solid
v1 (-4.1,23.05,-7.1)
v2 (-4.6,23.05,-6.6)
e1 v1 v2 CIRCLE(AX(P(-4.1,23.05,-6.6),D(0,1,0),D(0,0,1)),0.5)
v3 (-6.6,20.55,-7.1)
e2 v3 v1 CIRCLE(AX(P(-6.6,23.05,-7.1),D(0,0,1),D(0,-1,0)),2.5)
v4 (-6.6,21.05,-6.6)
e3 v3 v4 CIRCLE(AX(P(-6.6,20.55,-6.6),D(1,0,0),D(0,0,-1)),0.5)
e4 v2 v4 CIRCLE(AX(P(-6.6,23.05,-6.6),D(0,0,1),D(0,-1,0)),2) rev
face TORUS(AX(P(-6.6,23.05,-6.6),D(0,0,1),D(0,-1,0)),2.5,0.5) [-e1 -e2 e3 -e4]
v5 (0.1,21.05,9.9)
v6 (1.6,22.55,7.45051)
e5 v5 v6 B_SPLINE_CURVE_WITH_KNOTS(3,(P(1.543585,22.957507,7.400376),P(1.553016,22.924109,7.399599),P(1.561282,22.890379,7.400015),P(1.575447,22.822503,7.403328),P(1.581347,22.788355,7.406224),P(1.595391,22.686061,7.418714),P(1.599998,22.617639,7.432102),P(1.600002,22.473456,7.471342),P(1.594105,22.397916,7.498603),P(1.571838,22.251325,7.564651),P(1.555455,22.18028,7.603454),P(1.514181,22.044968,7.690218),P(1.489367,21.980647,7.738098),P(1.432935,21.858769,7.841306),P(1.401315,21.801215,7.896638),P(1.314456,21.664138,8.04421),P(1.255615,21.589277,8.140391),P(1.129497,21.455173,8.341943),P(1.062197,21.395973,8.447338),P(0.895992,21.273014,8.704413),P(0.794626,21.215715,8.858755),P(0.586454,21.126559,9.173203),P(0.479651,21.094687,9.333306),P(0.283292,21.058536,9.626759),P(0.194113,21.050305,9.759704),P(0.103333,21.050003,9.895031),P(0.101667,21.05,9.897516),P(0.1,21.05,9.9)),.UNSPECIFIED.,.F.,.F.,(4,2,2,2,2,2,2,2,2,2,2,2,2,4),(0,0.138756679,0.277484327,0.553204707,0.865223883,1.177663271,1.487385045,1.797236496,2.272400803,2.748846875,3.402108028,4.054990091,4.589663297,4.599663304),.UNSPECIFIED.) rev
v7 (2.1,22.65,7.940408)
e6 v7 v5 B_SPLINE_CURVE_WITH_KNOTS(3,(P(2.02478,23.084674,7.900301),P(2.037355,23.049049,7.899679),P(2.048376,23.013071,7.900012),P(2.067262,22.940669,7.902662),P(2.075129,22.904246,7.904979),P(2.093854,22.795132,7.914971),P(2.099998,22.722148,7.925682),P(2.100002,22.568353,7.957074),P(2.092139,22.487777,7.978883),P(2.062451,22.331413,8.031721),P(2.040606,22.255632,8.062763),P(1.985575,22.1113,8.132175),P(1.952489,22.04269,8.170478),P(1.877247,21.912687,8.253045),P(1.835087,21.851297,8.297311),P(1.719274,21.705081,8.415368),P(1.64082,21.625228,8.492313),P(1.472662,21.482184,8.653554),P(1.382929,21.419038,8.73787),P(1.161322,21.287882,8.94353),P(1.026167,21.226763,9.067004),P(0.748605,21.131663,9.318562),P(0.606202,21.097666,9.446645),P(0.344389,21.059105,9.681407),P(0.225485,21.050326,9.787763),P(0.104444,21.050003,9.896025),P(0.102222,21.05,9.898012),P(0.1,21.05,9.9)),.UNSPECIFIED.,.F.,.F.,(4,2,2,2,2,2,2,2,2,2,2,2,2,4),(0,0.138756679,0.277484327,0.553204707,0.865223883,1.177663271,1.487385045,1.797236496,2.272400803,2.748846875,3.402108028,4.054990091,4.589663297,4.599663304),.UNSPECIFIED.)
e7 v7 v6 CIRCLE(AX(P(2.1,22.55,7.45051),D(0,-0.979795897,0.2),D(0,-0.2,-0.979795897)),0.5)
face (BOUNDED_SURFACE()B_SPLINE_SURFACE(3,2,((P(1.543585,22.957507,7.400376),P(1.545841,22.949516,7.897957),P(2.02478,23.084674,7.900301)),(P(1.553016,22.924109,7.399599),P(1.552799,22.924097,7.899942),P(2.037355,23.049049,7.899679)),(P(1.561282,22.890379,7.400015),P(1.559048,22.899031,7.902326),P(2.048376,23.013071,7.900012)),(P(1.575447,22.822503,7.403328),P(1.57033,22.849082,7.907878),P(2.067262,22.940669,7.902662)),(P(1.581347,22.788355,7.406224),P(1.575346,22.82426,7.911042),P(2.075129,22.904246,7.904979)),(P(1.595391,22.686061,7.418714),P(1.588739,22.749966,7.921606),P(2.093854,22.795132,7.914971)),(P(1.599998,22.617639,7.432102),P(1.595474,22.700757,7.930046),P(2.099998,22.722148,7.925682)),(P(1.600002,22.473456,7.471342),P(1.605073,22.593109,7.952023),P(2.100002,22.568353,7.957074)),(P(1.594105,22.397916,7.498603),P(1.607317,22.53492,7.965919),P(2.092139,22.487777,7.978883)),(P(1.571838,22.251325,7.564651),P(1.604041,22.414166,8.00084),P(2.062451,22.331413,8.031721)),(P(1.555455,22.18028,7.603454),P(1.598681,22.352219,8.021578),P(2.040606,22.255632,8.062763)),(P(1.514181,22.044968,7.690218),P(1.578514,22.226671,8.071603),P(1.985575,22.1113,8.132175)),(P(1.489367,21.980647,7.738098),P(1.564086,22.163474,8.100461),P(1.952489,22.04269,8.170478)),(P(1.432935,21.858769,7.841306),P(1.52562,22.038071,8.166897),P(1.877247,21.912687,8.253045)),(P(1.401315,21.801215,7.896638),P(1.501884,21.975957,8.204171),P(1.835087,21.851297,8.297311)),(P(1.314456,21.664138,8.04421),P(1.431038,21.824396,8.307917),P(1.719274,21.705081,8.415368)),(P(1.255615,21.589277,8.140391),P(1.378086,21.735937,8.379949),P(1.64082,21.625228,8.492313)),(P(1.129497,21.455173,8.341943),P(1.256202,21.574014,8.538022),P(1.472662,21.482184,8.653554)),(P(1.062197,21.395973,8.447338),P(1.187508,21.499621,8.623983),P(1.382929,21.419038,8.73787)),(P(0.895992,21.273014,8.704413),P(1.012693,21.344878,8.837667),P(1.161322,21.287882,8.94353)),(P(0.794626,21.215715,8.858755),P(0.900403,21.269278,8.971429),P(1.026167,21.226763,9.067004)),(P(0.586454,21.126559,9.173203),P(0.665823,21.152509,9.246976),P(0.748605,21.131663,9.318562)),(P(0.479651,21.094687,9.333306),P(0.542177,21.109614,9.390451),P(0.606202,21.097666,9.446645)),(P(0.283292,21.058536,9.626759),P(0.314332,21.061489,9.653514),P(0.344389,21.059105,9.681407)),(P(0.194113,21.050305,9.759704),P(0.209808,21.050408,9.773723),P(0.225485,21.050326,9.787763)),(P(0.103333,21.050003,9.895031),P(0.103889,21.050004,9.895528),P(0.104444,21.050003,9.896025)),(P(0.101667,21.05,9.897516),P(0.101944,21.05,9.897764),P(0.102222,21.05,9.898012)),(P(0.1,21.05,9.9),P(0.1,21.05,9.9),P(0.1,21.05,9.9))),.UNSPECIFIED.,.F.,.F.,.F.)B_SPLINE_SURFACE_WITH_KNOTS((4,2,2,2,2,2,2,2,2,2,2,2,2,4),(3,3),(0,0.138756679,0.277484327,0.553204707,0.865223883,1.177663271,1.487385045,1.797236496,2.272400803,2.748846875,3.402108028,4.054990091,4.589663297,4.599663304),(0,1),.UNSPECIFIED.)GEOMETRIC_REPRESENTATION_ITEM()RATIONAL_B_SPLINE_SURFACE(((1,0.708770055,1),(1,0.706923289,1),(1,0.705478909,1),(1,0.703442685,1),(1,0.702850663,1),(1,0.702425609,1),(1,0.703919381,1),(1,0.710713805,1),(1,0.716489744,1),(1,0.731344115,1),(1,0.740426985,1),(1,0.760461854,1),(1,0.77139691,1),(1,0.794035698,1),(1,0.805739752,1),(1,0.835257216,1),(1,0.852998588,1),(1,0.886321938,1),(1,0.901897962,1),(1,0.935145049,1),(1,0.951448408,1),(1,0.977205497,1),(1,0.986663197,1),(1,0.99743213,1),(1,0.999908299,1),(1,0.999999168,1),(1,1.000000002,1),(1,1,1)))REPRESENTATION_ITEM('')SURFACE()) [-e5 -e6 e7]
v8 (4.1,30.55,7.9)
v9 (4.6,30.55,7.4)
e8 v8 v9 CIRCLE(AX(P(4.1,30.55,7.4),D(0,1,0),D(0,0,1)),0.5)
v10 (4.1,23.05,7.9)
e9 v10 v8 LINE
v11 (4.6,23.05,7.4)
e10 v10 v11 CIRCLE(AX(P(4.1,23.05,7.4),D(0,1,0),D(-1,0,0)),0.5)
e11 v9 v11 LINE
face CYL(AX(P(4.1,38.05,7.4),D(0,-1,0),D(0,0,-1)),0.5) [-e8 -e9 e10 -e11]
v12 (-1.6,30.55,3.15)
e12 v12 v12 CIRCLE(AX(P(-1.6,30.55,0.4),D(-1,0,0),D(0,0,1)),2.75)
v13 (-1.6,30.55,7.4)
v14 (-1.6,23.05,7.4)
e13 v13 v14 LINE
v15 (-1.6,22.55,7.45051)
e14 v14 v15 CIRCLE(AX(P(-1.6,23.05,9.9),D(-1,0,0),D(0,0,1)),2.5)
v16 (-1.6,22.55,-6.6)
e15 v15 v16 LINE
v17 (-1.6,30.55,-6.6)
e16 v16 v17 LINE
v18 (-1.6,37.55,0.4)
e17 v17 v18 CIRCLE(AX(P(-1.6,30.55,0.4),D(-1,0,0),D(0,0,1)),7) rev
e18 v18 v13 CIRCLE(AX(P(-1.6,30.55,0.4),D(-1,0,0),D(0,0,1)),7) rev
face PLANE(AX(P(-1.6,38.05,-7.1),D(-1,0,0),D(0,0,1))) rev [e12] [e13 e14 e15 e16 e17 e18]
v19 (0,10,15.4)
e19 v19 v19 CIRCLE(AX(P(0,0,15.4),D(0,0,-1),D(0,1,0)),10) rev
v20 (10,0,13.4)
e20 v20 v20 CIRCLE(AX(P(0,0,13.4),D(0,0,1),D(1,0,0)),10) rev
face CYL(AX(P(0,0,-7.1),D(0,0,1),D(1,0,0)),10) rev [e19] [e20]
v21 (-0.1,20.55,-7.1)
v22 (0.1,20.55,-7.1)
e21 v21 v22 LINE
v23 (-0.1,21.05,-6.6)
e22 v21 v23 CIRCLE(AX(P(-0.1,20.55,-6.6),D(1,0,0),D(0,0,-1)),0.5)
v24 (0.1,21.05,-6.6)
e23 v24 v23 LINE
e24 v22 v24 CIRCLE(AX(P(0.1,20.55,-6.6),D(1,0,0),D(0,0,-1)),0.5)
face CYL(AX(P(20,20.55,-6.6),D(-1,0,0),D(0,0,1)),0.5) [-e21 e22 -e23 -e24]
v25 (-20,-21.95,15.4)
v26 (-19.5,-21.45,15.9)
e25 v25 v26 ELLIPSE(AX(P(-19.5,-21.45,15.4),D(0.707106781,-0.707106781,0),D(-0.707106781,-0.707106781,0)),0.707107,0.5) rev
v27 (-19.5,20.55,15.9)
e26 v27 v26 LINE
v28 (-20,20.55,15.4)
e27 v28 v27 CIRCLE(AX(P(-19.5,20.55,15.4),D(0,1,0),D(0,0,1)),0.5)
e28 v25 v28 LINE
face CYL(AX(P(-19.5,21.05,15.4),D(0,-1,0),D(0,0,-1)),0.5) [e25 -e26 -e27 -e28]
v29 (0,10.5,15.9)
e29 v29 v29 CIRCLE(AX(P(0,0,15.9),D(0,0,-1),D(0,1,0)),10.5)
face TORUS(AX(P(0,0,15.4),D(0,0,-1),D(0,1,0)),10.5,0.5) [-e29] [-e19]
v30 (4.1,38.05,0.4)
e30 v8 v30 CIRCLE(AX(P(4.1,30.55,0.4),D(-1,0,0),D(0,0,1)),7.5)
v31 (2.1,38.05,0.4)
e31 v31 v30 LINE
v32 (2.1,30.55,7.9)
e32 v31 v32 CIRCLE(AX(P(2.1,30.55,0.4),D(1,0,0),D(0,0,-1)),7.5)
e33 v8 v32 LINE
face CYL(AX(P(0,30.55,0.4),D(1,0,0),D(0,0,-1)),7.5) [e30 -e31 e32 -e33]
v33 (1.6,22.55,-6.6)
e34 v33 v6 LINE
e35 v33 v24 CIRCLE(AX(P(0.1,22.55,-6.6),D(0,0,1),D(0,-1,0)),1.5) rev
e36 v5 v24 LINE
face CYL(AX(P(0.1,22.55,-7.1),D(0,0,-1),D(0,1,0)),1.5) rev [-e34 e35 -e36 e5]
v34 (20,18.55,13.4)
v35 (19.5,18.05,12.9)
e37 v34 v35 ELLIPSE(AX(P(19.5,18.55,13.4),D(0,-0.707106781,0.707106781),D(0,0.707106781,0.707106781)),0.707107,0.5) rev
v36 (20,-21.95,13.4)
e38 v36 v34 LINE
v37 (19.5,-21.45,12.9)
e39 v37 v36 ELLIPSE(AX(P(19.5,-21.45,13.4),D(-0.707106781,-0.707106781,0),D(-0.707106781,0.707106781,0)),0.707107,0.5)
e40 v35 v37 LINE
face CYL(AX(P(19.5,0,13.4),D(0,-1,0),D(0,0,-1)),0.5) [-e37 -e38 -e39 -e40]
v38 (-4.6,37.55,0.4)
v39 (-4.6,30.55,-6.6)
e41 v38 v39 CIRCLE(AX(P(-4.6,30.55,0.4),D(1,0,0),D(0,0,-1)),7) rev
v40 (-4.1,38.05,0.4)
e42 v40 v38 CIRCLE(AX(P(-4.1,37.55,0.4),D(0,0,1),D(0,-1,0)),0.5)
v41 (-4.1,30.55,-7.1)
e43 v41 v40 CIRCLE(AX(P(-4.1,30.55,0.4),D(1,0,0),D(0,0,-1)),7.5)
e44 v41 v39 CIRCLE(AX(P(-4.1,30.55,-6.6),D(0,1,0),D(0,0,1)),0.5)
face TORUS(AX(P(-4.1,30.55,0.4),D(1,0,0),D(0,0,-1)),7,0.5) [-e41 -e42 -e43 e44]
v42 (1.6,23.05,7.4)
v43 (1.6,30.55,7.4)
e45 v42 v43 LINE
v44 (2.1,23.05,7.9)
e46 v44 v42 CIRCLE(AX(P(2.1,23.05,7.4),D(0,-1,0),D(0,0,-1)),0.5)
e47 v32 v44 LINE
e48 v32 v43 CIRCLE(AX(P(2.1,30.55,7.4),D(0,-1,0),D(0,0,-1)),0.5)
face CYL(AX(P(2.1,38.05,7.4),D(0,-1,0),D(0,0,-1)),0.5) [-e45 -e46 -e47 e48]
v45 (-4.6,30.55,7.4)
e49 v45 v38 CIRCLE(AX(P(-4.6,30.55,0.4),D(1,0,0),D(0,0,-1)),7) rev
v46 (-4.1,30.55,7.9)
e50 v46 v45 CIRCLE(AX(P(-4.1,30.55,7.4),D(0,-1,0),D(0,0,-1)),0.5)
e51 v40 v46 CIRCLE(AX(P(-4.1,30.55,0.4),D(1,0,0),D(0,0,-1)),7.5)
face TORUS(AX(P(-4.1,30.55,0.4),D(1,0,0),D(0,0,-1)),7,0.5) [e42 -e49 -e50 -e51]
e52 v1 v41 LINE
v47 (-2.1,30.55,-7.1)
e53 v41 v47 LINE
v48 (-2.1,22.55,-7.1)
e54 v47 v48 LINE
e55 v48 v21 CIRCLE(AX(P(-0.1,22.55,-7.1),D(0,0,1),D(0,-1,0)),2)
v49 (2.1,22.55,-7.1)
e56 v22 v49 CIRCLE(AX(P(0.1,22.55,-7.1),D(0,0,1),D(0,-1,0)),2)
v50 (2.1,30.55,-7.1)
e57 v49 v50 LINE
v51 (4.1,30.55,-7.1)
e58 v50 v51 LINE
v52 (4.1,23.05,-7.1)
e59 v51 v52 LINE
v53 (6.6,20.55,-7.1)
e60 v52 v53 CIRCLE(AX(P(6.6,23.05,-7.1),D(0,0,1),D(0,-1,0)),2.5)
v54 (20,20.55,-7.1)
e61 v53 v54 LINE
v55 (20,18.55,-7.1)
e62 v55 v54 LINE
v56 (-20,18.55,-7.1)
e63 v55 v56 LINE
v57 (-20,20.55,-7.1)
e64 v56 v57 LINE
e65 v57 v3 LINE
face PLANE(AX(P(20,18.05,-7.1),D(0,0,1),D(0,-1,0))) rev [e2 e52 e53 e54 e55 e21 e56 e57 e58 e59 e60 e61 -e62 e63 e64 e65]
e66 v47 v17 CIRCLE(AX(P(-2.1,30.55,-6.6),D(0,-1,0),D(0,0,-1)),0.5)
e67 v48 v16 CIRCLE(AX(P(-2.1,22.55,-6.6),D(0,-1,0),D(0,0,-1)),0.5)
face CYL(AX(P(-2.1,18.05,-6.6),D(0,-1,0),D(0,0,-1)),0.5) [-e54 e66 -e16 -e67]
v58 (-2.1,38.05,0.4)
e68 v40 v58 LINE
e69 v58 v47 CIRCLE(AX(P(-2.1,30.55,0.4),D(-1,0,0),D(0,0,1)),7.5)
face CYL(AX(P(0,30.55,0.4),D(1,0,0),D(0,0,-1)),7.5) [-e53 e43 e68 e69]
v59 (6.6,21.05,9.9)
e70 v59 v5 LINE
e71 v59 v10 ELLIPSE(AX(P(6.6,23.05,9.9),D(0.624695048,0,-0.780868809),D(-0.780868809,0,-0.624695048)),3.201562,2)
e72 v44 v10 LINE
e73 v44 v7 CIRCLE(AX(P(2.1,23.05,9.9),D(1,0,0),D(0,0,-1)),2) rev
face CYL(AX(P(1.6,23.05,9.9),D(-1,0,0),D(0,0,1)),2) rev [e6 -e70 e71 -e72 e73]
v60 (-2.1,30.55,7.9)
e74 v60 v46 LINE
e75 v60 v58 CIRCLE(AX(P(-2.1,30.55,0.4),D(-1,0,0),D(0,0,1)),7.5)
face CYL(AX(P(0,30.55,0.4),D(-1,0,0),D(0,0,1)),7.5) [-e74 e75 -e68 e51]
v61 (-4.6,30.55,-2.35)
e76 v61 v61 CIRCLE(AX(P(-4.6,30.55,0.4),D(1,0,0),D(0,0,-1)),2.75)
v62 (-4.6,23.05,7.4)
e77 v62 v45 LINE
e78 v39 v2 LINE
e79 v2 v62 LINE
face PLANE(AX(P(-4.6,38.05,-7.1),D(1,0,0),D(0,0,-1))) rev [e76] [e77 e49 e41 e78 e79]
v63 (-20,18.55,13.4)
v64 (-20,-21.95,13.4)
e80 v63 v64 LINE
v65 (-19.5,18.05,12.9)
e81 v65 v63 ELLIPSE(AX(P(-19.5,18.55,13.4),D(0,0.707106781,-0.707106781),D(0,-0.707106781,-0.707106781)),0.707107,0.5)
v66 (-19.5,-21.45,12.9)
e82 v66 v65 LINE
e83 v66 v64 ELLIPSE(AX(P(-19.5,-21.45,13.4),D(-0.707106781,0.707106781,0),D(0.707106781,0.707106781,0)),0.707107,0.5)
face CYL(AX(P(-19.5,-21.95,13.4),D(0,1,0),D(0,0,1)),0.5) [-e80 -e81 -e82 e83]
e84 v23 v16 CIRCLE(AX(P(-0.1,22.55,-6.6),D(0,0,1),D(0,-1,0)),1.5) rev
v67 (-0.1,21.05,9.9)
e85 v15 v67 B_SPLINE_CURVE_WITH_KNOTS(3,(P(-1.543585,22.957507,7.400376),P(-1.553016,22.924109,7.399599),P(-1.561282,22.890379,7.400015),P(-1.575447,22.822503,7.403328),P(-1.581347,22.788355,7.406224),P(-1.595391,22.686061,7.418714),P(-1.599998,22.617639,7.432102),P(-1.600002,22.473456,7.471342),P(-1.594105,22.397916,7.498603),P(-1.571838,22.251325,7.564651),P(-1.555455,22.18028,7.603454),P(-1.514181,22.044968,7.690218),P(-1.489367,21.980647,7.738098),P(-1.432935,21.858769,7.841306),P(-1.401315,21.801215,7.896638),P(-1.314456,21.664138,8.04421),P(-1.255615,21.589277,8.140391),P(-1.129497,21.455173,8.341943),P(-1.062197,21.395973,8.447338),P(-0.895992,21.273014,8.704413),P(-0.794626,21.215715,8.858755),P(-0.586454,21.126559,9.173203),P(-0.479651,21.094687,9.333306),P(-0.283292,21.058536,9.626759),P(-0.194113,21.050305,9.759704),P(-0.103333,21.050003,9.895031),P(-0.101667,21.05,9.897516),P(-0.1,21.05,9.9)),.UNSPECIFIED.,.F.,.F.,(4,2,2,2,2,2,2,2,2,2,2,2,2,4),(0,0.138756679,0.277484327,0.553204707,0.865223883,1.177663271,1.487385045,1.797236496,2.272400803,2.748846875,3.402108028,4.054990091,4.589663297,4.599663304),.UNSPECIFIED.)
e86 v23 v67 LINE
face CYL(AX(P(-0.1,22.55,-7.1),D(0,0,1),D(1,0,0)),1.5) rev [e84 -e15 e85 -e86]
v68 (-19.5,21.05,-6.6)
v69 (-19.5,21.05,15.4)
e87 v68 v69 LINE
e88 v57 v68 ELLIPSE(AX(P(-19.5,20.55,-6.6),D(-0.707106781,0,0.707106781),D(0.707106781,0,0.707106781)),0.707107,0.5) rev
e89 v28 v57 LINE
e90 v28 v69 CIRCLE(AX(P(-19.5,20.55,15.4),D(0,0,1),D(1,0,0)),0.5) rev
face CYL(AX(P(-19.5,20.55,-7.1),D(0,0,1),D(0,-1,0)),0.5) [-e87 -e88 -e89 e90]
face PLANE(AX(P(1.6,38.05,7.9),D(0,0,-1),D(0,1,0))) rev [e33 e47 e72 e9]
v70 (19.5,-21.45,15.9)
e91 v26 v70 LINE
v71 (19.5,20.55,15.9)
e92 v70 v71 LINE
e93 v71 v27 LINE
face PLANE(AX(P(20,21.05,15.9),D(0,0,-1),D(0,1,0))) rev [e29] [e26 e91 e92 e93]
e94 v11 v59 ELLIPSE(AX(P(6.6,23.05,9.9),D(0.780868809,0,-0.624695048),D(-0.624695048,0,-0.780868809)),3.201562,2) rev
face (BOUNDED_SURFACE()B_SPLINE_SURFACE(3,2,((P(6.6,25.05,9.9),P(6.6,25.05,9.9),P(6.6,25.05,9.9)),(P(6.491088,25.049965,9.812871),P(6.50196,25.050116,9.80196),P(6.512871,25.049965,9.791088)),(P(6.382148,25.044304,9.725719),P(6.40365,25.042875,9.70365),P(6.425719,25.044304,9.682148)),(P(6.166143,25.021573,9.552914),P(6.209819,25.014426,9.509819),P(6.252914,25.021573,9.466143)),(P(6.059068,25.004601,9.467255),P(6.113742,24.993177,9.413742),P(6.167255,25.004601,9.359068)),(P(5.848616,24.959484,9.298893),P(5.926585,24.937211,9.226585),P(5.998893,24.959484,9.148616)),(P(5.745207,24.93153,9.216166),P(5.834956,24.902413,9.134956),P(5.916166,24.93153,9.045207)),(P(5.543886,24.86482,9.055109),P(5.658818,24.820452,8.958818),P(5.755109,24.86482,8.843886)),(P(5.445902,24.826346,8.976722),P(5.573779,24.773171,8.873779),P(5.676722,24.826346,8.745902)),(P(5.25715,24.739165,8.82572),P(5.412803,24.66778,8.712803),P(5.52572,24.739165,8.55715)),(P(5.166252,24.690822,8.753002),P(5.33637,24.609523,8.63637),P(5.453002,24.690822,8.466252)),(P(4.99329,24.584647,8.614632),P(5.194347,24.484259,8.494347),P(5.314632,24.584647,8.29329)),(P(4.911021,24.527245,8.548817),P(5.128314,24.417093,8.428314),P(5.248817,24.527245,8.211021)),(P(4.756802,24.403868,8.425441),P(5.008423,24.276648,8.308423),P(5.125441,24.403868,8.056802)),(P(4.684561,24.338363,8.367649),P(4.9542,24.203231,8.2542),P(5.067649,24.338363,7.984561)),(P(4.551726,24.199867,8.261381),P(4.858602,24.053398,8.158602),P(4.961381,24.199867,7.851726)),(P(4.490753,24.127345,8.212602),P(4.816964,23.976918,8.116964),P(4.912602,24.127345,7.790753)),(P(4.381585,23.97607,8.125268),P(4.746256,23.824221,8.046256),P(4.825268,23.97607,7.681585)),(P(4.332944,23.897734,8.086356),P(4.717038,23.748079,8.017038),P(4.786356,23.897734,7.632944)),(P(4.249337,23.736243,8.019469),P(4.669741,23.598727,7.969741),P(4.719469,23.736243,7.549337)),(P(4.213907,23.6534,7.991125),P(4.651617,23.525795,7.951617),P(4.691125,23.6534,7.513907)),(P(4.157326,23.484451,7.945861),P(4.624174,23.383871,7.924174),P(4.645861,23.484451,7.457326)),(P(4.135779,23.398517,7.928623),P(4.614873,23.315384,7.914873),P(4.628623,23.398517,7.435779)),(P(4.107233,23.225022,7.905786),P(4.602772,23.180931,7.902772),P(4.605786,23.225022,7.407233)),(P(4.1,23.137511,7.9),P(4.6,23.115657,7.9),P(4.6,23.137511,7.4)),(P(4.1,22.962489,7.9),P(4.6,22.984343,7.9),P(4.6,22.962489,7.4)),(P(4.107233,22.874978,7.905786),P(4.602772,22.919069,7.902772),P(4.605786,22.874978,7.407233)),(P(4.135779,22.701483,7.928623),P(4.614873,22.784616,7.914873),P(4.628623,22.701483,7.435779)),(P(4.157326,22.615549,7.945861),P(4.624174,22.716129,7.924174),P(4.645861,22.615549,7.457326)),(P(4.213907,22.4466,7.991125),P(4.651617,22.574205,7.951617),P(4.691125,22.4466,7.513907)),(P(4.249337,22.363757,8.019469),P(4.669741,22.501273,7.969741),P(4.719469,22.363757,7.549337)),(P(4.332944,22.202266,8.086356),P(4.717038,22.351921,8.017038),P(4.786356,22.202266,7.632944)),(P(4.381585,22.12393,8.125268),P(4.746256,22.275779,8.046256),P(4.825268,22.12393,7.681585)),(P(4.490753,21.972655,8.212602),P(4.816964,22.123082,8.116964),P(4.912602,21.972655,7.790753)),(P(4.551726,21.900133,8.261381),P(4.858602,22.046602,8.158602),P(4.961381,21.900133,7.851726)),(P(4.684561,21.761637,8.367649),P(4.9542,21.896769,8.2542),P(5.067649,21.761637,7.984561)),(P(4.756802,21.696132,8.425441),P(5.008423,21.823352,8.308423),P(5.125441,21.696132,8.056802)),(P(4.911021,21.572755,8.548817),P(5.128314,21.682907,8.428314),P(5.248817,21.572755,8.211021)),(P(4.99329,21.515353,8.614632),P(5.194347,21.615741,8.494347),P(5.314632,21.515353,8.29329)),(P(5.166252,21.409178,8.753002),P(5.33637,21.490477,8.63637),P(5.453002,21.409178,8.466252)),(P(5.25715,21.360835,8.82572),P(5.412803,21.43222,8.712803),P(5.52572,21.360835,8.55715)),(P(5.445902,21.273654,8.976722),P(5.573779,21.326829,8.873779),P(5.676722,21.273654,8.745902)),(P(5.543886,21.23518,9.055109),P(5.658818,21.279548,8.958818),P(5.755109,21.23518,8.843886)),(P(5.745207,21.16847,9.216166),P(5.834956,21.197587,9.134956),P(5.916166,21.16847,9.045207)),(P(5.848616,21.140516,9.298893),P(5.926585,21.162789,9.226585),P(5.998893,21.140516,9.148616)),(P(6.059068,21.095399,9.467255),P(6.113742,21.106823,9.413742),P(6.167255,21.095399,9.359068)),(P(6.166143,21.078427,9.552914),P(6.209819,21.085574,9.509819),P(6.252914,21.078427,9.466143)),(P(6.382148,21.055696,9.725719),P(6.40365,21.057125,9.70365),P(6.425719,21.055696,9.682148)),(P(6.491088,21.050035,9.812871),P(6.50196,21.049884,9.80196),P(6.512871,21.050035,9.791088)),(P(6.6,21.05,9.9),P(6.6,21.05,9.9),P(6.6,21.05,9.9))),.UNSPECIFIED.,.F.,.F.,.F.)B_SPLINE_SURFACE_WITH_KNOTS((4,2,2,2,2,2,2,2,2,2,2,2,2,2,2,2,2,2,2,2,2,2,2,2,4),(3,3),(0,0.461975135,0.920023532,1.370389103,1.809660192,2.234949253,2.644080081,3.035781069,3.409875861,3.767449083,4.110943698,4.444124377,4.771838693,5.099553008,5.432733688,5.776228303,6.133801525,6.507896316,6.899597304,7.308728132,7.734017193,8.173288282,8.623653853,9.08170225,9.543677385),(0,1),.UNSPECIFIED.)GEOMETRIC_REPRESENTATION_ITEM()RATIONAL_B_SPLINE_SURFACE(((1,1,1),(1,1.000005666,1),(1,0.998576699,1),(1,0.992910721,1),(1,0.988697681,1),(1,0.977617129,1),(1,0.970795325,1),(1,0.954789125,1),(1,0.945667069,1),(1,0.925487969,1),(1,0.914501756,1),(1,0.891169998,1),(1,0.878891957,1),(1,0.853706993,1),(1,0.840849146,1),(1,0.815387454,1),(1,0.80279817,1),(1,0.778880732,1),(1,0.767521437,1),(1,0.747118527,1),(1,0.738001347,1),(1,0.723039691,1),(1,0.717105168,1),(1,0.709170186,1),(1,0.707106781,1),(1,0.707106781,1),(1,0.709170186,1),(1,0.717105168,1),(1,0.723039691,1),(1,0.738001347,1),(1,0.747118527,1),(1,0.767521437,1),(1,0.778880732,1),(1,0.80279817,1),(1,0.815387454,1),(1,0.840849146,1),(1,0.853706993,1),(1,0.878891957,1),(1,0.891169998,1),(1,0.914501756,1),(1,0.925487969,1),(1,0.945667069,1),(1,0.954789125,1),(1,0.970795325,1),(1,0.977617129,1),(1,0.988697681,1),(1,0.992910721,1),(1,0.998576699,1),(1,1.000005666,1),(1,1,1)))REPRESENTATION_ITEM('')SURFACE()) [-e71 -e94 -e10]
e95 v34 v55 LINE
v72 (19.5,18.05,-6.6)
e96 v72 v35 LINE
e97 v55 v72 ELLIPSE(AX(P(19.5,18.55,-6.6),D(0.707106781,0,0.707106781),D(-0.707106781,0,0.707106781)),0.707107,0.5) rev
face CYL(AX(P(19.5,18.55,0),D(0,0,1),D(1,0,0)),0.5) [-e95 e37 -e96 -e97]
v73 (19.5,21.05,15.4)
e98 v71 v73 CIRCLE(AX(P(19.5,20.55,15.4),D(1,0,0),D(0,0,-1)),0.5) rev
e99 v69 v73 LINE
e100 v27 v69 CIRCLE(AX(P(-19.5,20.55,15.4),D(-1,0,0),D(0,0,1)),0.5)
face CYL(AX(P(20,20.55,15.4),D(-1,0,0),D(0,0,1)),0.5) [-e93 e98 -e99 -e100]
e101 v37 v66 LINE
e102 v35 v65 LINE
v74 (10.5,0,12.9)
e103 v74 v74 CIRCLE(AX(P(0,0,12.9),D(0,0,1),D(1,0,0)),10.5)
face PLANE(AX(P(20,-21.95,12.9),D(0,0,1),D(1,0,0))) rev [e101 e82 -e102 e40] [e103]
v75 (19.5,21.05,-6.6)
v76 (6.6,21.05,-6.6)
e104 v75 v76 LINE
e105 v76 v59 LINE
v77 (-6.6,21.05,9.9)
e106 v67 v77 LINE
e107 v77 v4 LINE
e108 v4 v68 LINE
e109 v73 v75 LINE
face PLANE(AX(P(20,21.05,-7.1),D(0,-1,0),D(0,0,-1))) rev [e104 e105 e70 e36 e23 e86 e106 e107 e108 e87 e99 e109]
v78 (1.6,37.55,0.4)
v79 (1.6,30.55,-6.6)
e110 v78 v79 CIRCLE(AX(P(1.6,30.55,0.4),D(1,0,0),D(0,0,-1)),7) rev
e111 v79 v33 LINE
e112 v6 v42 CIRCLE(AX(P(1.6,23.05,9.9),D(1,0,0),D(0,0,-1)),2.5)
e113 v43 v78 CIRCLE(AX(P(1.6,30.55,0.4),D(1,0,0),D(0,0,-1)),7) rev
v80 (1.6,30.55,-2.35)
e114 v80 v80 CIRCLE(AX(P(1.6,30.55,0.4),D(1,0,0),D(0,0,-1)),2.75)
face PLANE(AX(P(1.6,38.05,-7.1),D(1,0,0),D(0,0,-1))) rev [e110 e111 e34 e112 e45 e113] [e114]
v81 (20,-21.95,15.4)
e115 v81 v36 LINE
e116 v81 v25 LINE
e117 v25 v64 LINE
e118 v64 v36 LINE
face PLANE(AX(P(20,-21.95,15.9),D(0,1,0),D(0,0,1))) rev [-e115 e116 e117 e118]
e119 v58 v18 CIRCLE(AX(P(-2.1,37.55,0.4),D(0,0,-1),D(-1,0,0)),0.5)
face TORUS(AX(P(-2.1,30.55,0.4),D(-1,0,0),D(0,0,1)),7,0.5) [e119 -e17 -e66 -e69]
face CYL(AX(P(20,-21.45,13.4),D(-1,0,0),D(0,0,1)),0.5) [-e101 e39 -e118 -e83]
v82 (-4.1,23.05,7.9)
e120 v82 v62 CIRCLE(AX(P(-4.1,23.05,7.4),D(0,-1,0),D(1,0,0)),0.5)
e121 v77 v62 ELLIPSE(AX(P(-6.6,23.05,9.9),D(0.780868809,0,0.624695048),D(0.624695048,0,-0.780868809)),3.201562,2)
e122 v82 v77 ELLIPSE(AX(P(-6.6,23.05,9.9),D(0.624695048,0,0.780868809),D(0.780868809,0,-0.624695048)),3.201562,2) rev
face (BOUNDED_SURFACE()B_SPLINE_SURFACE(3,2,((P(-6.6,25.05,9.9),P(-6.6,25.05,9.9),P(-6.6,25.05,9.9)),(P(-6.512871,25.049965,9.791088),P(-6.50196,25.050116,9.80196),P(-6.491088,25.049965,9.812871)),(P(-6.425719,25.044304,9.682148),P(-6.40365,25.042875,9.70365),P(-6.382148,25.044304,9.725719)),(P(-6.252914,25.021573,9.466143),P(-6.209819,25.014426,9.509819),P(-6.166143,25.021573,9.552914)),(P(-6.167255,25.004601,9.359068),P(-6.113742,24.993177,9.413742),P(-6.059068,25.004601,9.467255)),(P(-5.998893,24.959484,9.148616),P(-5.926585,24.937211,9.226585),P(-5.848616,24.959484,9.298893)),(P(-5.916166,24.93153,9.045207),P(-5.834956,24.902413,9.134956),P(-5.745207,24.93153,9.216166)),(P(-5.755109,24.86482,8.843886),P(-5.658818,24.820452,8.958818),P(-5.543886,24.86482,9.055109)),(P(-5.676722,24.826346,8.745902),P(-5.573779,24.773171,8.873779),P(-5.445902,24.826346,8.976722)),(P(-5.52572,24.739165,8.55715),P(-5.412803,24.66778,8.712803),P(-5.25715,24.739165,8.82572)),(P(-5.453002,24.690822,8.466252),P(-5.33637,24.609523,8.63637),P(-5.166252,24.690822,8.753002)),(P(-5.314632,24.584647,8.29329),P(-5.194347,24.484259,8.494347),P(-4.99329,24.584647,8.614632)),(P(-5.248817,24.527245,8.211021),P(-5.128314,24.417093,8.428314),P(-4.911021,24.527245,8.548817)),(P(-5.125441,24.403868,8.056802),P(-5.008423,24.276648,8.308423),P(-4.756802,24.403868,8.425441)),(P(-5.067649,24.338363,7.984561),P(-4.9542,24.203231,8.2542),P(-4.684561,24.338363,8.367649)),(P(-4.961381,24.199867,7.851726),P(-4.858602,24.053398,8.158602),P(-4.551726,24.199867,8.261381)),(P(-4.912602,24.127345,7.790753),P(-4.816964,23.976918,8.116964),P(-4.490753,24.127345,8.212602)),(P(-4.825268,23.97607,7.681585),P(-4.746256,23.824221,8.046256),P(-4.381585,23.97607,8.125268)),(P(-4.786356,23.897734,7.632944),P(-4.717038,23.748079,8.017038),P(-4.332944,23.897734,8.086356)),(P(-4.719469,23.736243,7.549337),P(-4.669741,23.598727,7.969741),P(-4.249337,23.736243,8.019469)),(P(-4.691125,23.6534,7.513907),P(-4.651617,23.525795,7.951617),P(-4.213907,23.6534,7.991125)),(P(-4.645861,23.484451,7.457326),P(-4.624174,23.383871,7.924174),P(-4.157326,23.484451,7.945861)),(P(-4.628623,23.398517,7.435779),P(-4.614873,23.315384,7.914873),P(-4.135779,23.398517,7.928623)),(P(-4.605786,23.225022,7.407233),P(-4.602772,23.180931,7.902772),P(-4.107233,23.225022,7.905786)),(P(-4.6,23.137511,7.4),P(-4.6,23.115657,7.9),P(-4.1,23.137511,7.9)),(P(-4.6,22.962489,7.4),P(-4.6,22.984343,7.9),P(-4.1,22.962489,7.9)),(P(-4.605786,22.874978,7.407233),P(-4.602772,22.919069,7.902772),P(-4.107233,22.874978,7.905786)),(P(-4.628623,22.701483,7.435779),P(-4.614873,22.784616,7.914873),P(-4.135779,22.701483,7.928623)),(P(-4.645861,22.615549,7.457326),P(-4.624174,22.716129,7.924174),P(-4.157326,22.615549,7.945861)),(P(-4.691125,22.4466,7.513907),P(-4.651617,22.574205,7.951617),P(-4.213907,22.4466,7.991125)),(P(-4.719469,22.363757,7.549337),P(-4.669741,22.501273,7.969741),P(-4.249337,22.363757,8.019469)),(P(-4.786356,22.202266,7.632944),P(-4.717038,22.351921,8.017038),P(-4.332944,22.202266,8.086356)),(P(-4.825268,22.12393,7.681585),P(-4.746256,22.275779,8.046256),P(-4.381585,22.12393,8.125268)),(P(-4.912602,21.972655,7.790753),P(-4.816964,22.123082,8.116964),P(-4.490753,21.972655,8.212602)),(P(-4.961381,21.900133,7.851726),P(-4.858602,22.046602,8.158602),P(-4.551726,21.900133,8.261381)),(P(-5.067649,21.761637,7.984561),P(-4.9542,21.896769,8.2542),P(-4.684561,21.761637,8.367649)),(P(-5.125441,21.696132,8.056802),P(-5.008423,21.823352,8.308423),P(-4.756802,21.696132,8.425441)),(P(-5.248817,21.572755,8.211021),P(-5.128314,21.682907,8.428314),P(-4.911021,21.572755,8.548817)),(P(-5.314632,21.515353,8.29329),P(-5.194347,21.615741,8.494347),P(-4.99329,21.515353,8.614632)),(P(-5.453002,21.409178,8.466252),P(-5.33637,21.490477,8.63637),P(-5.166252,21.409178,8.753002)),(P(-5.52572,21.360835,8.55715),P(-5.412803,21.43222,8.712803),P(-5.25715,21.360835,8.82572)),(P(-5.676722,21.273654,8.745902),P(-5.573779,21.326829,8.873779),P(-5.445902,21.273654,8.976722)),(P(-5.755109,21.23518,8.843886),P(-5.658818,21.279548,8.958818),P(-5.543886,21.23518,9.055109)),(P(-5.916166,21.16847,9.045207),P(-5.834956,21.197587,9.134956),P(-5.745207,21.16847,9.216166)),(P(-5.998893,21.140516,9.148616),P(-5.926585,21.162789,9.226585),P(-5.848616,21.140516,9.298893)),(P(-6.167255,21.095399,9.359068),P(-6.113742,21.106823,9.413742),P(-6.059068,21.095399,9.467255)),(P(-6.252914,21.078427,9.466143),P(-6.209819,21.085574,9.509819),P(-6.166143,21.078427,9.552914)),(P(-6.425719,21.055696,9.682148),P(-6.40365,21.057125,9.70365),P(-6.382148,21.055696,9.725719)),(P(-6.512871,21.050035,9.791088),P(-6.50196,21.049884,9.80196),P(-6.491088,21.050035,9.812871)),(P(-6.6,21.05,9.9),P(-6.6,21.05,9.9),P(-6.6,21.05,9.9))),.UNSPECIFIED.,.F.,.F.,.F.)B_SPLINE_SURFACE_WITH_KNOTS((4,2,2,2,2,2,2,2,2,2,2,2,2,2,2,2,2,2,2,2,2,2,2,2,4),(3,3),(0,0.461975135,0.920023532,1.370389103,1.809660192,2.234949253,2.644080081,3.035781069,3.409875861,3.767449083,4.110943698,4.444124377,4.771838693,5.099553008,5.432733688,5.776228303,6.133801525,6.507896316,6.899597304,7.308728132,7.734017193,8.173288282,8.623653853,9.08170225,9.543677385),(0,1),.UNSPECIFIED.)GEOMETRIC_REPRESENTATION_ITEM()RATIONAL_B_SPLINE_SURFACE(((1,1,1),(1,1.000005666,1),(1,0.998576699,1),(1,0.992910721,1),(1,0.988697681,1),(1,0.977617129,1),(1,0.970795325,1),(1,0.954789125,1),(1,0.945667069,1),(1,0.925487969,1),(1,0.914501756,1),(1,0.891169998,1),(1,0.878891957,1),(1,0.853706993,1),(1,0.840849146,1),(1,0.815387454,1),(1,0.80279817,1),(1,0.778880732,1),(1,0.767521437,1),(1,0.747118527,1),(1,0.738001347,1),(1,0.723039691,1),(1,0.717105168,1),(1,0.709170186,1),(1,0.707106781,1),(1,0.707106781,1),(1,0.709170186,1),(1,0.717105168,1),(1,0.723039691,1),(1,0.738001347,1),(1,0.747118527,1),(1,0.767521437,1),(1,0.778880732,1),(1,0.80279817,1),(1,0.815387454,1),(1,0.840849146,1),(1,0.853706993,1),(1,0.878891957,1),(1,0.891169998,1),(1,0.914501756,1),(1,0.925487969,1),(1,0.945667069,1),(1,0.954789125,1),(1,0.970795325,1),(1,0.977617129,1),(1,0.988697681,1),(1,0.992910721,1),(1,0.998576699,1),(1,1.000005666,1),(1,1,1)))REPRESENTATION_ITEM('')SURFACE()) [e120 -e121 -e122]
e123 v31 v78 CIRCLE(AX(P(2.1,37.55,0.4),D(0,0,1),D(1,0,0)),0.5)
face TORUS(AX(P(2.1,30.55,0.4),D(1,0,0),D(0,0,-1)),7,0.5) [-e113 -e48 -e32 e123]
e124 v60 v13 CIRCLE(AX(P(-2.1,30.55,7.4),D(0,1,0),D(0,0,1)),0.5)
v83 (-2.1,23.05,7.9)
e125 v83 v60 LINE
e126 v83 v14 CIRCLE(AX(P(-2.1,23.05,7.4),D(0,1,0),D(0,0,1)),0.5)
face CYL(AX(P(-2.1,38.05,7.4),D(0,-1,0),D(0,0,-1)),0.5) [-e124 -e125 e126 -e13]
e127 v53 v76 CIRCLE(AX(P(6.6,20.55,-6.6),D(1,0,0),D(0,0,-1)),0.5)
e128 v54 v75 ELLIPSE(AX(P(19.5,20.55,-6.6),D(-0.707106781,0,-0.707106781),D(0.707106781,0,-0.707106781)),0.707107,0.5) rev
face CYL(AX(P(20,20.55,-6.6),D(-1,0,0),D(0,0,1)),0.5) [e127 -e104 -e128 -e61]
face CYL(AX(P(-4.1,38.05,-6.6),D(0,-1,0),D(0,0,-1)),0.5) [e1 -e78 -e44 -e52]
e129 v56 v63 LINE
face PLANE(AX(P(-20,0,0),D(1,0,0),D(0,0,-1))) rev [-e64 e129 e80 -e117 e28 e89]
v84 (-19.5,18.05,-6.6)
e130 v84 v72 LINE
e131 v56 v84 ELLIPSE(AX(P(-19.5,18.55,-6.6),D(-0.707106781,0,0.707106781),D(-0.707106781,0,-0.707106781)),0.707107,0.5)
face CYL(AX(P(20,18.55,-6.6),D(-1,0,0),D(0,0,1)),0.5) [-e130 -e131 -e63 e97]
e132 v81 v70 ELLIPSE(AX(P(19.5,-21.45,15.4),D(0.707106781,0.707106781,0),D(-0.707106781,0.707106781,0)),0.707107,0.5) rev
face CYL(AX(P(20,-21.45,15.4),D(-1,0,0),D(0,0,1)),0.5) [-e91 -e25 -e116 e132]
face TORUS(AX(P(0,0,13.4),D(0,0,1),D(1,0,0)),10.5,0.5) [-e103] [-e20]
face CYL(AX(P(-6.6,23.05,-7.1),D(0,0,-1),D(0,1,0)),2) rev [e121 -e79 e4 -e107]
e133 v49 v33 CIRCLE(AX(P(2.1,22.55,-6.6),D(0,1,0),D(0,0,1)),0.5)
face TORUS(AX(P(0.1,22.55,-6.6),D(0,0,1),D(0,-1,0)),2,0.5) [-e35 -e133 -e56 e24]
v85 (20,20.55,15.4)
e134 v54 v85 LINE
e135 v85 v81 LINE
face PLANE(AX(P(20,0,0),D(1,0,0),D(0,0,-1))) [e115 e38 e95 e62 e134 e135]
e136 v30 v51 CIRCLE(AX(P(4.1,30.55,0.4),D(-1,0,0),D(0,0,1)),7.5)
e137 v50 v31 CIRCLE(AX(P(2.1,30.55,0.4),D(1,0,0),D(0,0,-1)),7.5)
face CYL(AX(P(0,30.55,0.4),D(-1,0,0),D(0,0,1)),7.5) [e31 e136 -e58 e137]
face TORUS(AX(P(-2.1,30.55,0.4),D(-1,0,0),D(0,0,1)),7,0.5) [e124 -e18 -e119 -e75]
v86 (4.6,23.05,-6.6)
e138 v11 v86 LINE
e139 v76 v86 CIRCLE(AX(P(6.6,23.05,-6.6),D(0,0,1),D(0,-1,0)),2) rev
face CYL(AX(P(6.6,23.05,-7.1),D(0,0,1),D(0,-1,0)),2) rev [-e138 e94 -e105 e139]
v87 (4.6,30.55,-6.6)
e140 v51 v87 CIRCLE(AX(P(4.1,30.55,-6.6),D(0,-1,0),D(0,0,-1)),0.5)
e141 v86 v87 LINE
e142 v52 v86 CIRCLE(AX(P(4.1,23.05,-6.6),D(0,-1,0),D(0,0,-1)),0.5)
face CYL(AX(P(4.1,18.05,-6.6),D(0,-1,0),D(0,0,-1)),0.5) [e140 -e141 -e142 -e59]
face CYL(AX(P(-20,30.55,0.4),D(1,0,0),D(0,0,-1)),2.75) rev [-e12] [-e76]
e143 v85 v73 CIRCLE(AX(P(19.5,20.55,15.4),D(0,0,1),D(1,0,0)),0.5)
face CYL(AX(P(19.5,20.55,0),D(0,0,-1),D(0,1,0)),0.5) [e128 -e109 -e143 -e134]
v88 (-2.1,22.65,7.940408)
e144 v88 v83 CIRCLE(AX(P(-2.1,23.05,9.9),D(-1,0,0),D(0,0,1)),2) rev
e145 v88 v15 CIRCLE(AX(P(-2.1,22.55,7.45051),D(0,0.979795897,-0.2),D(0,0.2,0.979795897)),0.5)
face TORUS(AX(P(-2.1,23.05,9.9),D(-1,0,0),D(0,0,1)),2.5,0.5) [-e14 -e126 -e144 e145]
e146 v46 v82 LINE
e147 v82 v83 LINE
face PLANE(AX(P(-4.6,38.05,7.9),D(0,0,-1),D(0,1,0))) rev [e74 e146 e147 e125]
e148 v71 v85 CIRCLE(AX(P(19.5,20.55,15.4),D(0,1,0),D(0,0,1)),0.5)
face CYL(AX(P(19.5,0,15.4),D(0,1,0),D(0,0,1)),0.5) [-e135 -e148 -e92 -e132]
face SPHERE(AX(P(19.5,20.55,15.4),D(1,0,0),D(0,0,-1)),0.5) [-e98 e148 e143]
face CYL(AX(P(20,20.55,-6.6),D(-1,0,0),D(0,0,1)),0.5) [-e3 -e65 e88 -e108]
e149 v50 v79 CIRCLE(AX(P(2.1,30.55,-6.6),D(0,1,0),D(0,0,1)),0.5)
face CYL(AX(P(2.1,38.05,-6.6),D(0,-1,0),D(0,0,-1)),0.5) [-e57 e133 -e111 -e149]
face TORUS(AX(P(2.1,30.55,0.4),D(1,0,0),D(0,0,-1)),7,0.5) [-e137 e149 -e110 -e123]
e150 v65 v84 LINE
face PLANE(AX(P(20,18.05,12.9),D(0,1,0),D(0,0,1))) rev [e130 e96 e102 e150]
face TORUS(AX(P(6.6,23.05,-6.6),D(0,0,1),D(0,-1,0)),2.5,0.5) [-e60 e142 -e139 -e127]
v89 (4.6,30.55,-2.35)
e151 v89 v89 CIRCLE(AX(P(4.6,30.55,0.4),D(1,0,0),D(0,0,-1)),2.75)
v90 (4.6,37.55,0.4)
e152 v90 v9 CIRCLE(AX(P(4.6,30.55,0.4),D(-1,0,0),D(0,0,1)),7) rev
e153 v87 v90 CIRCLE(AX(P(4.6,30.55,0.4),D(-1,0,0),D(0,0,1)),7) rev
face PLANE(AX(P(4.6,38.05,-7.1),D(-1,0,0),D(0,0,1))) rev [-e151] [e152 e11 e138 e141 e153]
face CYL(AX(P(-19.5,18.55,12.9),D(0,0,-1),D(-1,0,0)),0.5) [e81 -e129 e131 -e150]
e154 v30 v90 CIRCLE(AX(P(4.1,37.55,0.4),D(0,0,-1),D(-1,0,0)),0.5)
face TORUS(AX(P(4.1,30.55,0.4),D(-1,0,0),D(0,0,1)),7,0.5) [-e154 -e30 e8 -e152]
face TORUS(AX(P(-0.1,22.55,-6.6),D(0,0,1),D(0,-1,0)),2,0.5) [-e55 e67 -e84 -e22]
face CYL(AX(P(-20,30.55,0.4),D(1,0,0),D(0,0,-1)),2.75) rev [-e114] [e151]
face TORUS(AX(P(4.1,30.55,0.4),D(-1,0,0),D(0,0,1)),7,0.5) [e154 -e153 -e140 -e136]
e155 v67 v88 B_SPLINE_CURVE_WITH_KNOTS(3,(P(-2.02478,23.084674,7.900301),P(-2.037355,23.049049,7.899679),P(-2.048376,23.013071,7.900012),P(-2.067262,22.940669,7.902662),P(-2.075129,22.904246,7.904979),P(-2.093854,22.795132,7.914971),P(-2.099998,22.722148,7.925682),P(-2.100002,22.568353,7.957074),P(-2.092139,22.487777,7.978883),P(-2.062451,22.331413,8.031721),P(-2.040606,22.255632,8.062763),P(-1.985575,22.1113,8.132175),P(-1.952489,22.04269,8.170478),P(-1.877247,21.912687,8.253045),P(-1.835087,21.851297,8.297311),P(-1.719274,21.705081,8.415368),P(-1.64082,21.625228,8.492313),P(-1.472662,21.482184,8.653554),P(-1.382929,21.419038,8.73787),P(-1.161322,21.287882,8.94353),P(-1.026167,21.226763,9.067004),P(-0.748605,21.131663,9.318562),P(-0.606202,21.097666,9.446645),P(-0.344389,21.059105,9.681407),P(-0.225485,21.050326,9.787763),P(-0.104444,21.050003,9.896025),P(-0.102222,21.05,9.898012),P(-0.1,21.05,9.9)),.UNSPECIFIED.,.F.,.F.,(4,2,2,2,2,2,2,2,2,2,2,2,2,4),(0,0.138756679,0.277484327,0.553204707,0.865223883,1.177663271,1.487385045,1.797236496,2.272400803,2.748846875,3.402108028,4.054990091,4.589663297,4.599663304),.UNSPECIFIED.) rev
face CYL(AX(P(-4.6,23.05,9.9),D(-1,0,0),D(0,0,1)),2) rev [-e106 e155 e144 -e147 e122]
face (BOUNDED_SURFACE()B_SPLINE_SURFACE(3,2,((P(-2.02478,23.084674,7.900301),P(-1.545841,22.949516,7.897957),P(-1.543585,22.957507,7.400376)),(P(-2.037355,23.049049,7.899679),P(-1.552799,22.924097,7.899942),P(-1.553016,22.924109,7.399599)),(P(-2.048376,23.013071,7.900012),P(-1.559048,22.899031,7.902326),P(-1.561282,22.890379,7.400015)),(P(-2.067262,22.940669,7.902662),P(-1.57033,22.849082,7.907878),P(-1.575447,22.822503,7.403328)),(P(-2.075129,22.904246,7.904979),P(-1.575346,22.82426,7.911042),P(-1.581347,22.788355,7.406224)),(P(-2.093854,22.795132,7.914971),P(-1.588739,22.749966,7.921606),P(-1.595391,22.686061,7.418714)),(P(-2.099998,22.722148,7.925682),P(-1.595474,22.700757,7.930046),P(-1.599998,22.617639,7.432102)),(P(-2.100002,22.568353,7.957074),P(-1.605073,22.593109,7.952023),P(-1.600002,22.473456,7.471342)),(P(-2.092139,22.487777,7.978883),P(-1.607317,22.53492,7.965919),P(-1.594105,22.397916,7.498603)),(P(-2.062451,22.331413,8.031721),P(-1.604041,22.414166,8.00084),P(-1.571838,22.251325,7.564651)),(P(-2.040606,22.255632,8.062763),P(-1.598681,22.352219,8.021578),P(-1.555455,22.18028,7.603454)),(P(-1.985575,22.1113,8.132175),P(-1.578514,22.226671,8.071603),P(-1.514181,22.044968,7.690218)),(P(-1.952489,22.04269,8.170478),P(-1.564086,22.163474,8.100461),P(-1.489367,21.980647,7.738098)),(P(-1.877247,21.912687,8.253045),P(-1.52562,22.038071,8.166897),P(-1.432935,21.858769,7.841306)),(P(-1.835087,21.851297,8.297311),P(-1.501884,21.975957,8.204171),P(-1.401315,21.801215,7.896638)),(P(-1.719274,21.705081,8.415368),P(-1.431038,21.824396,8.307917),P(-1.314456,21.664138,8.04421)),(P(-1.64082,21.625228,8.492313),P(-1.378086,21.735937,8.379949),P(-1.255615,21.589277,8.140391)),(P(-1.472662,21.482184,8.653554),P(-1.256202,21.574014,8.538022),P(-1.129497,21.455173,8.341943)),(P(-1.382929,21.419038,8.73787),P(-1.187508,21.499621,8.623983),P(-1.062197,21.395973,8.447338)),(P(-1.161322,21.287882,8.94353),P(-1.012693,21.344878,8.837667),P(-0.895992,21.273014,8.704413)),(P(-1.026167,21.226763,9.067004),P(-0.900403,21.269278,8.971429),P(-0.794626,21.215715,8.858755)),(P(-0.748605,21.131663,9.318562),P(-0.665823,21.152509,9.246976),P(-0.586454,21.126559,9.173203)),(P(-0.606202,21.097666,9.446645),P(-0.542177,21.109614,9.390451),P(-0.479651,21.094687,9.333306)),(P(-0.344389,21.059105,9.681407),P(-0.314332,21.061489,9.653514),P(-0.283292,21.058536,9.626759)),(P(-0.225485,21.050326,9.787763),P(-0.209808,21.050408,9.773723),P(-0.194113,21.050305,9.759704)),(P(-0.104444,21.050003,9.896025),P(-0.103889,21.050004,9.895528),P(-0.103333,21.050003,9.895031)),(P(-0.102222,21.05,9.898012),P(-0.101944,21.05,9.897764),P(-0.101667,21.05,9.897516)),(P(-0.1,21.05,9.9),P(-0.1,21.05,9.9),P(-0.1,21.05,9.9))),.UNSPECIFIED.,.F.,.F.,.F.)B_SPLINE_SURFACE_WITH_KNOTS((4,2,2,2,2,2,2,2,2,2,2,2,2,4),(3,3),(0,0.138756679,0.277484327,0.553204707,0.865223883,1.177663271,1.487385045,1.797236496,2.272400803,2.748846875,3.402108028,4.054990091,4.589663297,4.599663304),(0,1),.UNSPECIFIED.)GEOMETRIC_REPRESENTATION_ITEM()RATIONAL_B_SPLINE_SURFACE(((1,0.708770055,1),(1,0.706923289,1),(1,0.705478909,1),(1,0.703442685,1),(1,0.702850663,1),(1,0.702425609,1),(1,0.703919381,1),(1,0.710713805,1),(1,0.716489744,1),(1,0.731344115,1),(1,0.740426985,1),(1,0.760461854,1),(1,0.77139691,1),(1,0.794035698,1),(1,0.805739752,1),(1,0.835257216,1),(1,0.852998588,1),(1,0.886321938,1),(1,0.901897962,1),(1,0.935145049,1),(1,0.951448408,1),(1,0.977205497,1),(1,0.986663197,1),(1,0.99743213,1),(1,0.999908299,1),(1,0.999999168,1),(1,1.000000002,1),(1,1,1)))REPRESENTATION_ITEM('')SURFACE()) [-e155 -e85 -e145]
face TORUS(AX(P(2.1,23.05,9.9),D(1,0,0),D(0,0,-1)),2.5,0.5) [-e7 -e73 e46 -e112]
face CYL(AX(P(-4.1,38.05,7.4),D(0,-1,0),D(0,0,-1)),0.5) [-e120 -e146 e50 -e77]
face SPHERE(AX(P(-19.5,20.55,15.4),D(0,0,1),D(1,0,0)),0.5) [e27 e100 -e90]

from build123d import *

# Parameters (mm, degrees)
AUFSATZ_LINEAR_AUSTRAGEN1_DEPTH = 20
SKIZZE2_W                       = 3
SKIZZE2_H                       = 15
AUFSATZ_LINEAR_AUSTRAGEN2_DEPTH = 17
VERRUNDUNG1_R                   = 7.5
SKIZZE3_R                       = 2.75
SCHNITT_LINEAR_AUSTRAGEN1_DEPTH = 49.018459992
VERRUNDUNG2_R                   = 2
VERRUNDUNG3_R                   = 1.5
VERRUNDUNG4_R                   = 0.5
SKIZZE4_R                       = 10
SCHNITT_LINEAR_AUSTRAGEN2_DEPTH = 49.752461476
VERRUNDUNG5_R                   = 0.5


with BuildPart() as part:
    # Skizze1 → Aufsatz-Linear austragen1 (new, symmetric)
    with BuildSketch(Plane(origin=(0, 0, 0), x_dir=(0, 0, -1), z_dir=(1, 0, 0))):
        Polygon((7.1, 21.05), (-15.9, 21.05), (-15.9, -21.95), (-12.9, -21.95), (-12.9, 18.05), (7.1, 18.05), align=None)
    extrude(amount=AUFSATZ_LINEAR_AUSTRAGEN1_DEPTH, both=True)

    # Skizze2 → Aufsatz-Linear austragen2 (add)
    with BuildSketch(Plane(origin=(0, 21.05, 0), x_dir=(1, 0, 0), z_dir=(0, 1, 0))):
        with Locations((-3.1, -0.4)):
            Rectangle(SKIZZE2_W, SKIZZE2_H)
        with Locations((3.1, -0.4)):
            Rectangle(SKIZZE2_W, SKIZZE2_H)
    extrude(amount=AUFSATZ_LINEAR_AUSTRAGEN2_DEPTH)

    # Verrundung1
    verrundung1_edges = [part.edges().sort_by_distance(p)[0] for p in [
        (3.1, 38.05, -7.1),
        (-3.1, 38.05, -7.1),
        (3.1, 38.05, 7.9),
        (-3.1, 38.05, 7.9),
    ]]
    fillet(verrundung1_edges, radius=VERRUNDUNG1_R - 0.0001)  # a hair under: the kernel refuses the full size

    # Skizze3 → Schnitt-Linear austragen1 (cut, through all)
    with BuildSketch(Plane(origin=(4.6, 0, 0), x_dir=(0, 0, -1), z_dir=(1, 0, 0))):
        with Locations((-0.4, 30.55)):
            Circle(SKIZZE3_R)
    extrude(amount=-SCHNITT_LINEAR_AUSTRAGEN1_DEPTH, mode=Mode.SUBTRACT)

    # Verrundung2
    verrundung2_edges = [part.edges().sort_by_distance(p)[0] for p in [
        (-4.6, 21.05, 0.4),
        (-3.1, 21.05, 7.9),
        (3.1, 21.05, 7.9),
        (4.6, 21.05, 0.4),
    ]]
    fillet(verrundung2_edges, radius=VERRUNDUNG2_R)

    # Verrundung3
    verrundung3_edges = [part.edges().sort_by_distance(p)[0] for p in [
        (-1.6, 21.05, 1.4),
        (1.6, 21.05, 1.4),
    ]]
    fillet(verrundung3_edges, radius=VERRUNDUNG3_R)

    # Verrundung4
    verrundung4_edges = [part.edges().sort_by_distance(p)[0] for p in [
        (5.307902185, 21.523407966, 8.607902185),
        (1.6, 22.797991415, 7.915940607),
        (0, 21.05, -7.1),
        (0, 18.05, -7.1),
        (1.067090536, 21.40338068, 8.764815088),
        (1.160660172, 21.489339828, -7.1),
        (-1.160660172, 21.489339828, -7.1),
        (0, -21.95, 12.9),
        (-1.067090539, 21.403380676, 8.764815088),
        (0, -21.95, 15.9),
        (0, 21.05, 15.9),
        (13.3, 21.05, -7.1),
        (20, -0.45, 15.9),
        (20, -1.95, 12.9),
        (20, 18.05, 2.9),
        (1.6, 26.80005, 7.9),
        (1.6, 26.55005, -7.1),
        (1.6, 35.853330148, 5.703330148),
        (1.6, 35.853330148, -4.903330148),
        (-4.6, 26.80005, -7.1),
        (-1.6, 26.55005, -7.1),
        (4.6, 26.80005, -7.1),
        (4.6, 26.80005, 7.9),
        (4.6, 35.853330148, 5.703330148),
        (4.6, 35.853330148, -4.903330148),
        (-4.6, 26.80005, 7.9),
        (-4.6, 35.853330148, 5.703330148),
        (-4.6, 35.853330148, -4.903330148),
        (-1.6, 26.80005, 7.9),
        (-1.6, 35.853330148, 5.703330148),
        (-1.6, 35.853330148, -4.903330148),
        (-20, 18.05, 2.9),
        (-20, -1.95, 12.9),
        (-13.3, 21.05, -7.1),
        (-20, -0.45, 15.9),
        (-5.185786438, 21.635786438, -7.1),
        (-20, 21.05, 4.4),
        (-1.6, 22.797991415, 7.915940607),
        (5.185786438, 21.635786438, -7.1),
        (20, 21.05, 4.4),
        (-5.307902124, 21.523408018, 8.607902124),
    ]]
    fillet(verrundung4_edges, radius=VERRUNDUNG4_R)

    # Skizze4 → Schnitt-Linear austragen2 (cut, through all)
    with BuildSketch(Plane.XY.offset(15.9)):
        Circle(SKIZZE4_R)
    extrude(amount=-SCHNITT_LINEAR_AUSTRAGEN2_DEPTH, mode=Mode.SUBTRACT)

    # Verrundung5
    verrundung5_edges = [part.edges().sort_by_distance(p)[0] for p in [
        (-10, 0, 12.9),
        (-10, 0, 15.9),
    ]]
    fillet(verrundung5_edges, radius=VERRUNDUNG5_R)


solid = part.part
